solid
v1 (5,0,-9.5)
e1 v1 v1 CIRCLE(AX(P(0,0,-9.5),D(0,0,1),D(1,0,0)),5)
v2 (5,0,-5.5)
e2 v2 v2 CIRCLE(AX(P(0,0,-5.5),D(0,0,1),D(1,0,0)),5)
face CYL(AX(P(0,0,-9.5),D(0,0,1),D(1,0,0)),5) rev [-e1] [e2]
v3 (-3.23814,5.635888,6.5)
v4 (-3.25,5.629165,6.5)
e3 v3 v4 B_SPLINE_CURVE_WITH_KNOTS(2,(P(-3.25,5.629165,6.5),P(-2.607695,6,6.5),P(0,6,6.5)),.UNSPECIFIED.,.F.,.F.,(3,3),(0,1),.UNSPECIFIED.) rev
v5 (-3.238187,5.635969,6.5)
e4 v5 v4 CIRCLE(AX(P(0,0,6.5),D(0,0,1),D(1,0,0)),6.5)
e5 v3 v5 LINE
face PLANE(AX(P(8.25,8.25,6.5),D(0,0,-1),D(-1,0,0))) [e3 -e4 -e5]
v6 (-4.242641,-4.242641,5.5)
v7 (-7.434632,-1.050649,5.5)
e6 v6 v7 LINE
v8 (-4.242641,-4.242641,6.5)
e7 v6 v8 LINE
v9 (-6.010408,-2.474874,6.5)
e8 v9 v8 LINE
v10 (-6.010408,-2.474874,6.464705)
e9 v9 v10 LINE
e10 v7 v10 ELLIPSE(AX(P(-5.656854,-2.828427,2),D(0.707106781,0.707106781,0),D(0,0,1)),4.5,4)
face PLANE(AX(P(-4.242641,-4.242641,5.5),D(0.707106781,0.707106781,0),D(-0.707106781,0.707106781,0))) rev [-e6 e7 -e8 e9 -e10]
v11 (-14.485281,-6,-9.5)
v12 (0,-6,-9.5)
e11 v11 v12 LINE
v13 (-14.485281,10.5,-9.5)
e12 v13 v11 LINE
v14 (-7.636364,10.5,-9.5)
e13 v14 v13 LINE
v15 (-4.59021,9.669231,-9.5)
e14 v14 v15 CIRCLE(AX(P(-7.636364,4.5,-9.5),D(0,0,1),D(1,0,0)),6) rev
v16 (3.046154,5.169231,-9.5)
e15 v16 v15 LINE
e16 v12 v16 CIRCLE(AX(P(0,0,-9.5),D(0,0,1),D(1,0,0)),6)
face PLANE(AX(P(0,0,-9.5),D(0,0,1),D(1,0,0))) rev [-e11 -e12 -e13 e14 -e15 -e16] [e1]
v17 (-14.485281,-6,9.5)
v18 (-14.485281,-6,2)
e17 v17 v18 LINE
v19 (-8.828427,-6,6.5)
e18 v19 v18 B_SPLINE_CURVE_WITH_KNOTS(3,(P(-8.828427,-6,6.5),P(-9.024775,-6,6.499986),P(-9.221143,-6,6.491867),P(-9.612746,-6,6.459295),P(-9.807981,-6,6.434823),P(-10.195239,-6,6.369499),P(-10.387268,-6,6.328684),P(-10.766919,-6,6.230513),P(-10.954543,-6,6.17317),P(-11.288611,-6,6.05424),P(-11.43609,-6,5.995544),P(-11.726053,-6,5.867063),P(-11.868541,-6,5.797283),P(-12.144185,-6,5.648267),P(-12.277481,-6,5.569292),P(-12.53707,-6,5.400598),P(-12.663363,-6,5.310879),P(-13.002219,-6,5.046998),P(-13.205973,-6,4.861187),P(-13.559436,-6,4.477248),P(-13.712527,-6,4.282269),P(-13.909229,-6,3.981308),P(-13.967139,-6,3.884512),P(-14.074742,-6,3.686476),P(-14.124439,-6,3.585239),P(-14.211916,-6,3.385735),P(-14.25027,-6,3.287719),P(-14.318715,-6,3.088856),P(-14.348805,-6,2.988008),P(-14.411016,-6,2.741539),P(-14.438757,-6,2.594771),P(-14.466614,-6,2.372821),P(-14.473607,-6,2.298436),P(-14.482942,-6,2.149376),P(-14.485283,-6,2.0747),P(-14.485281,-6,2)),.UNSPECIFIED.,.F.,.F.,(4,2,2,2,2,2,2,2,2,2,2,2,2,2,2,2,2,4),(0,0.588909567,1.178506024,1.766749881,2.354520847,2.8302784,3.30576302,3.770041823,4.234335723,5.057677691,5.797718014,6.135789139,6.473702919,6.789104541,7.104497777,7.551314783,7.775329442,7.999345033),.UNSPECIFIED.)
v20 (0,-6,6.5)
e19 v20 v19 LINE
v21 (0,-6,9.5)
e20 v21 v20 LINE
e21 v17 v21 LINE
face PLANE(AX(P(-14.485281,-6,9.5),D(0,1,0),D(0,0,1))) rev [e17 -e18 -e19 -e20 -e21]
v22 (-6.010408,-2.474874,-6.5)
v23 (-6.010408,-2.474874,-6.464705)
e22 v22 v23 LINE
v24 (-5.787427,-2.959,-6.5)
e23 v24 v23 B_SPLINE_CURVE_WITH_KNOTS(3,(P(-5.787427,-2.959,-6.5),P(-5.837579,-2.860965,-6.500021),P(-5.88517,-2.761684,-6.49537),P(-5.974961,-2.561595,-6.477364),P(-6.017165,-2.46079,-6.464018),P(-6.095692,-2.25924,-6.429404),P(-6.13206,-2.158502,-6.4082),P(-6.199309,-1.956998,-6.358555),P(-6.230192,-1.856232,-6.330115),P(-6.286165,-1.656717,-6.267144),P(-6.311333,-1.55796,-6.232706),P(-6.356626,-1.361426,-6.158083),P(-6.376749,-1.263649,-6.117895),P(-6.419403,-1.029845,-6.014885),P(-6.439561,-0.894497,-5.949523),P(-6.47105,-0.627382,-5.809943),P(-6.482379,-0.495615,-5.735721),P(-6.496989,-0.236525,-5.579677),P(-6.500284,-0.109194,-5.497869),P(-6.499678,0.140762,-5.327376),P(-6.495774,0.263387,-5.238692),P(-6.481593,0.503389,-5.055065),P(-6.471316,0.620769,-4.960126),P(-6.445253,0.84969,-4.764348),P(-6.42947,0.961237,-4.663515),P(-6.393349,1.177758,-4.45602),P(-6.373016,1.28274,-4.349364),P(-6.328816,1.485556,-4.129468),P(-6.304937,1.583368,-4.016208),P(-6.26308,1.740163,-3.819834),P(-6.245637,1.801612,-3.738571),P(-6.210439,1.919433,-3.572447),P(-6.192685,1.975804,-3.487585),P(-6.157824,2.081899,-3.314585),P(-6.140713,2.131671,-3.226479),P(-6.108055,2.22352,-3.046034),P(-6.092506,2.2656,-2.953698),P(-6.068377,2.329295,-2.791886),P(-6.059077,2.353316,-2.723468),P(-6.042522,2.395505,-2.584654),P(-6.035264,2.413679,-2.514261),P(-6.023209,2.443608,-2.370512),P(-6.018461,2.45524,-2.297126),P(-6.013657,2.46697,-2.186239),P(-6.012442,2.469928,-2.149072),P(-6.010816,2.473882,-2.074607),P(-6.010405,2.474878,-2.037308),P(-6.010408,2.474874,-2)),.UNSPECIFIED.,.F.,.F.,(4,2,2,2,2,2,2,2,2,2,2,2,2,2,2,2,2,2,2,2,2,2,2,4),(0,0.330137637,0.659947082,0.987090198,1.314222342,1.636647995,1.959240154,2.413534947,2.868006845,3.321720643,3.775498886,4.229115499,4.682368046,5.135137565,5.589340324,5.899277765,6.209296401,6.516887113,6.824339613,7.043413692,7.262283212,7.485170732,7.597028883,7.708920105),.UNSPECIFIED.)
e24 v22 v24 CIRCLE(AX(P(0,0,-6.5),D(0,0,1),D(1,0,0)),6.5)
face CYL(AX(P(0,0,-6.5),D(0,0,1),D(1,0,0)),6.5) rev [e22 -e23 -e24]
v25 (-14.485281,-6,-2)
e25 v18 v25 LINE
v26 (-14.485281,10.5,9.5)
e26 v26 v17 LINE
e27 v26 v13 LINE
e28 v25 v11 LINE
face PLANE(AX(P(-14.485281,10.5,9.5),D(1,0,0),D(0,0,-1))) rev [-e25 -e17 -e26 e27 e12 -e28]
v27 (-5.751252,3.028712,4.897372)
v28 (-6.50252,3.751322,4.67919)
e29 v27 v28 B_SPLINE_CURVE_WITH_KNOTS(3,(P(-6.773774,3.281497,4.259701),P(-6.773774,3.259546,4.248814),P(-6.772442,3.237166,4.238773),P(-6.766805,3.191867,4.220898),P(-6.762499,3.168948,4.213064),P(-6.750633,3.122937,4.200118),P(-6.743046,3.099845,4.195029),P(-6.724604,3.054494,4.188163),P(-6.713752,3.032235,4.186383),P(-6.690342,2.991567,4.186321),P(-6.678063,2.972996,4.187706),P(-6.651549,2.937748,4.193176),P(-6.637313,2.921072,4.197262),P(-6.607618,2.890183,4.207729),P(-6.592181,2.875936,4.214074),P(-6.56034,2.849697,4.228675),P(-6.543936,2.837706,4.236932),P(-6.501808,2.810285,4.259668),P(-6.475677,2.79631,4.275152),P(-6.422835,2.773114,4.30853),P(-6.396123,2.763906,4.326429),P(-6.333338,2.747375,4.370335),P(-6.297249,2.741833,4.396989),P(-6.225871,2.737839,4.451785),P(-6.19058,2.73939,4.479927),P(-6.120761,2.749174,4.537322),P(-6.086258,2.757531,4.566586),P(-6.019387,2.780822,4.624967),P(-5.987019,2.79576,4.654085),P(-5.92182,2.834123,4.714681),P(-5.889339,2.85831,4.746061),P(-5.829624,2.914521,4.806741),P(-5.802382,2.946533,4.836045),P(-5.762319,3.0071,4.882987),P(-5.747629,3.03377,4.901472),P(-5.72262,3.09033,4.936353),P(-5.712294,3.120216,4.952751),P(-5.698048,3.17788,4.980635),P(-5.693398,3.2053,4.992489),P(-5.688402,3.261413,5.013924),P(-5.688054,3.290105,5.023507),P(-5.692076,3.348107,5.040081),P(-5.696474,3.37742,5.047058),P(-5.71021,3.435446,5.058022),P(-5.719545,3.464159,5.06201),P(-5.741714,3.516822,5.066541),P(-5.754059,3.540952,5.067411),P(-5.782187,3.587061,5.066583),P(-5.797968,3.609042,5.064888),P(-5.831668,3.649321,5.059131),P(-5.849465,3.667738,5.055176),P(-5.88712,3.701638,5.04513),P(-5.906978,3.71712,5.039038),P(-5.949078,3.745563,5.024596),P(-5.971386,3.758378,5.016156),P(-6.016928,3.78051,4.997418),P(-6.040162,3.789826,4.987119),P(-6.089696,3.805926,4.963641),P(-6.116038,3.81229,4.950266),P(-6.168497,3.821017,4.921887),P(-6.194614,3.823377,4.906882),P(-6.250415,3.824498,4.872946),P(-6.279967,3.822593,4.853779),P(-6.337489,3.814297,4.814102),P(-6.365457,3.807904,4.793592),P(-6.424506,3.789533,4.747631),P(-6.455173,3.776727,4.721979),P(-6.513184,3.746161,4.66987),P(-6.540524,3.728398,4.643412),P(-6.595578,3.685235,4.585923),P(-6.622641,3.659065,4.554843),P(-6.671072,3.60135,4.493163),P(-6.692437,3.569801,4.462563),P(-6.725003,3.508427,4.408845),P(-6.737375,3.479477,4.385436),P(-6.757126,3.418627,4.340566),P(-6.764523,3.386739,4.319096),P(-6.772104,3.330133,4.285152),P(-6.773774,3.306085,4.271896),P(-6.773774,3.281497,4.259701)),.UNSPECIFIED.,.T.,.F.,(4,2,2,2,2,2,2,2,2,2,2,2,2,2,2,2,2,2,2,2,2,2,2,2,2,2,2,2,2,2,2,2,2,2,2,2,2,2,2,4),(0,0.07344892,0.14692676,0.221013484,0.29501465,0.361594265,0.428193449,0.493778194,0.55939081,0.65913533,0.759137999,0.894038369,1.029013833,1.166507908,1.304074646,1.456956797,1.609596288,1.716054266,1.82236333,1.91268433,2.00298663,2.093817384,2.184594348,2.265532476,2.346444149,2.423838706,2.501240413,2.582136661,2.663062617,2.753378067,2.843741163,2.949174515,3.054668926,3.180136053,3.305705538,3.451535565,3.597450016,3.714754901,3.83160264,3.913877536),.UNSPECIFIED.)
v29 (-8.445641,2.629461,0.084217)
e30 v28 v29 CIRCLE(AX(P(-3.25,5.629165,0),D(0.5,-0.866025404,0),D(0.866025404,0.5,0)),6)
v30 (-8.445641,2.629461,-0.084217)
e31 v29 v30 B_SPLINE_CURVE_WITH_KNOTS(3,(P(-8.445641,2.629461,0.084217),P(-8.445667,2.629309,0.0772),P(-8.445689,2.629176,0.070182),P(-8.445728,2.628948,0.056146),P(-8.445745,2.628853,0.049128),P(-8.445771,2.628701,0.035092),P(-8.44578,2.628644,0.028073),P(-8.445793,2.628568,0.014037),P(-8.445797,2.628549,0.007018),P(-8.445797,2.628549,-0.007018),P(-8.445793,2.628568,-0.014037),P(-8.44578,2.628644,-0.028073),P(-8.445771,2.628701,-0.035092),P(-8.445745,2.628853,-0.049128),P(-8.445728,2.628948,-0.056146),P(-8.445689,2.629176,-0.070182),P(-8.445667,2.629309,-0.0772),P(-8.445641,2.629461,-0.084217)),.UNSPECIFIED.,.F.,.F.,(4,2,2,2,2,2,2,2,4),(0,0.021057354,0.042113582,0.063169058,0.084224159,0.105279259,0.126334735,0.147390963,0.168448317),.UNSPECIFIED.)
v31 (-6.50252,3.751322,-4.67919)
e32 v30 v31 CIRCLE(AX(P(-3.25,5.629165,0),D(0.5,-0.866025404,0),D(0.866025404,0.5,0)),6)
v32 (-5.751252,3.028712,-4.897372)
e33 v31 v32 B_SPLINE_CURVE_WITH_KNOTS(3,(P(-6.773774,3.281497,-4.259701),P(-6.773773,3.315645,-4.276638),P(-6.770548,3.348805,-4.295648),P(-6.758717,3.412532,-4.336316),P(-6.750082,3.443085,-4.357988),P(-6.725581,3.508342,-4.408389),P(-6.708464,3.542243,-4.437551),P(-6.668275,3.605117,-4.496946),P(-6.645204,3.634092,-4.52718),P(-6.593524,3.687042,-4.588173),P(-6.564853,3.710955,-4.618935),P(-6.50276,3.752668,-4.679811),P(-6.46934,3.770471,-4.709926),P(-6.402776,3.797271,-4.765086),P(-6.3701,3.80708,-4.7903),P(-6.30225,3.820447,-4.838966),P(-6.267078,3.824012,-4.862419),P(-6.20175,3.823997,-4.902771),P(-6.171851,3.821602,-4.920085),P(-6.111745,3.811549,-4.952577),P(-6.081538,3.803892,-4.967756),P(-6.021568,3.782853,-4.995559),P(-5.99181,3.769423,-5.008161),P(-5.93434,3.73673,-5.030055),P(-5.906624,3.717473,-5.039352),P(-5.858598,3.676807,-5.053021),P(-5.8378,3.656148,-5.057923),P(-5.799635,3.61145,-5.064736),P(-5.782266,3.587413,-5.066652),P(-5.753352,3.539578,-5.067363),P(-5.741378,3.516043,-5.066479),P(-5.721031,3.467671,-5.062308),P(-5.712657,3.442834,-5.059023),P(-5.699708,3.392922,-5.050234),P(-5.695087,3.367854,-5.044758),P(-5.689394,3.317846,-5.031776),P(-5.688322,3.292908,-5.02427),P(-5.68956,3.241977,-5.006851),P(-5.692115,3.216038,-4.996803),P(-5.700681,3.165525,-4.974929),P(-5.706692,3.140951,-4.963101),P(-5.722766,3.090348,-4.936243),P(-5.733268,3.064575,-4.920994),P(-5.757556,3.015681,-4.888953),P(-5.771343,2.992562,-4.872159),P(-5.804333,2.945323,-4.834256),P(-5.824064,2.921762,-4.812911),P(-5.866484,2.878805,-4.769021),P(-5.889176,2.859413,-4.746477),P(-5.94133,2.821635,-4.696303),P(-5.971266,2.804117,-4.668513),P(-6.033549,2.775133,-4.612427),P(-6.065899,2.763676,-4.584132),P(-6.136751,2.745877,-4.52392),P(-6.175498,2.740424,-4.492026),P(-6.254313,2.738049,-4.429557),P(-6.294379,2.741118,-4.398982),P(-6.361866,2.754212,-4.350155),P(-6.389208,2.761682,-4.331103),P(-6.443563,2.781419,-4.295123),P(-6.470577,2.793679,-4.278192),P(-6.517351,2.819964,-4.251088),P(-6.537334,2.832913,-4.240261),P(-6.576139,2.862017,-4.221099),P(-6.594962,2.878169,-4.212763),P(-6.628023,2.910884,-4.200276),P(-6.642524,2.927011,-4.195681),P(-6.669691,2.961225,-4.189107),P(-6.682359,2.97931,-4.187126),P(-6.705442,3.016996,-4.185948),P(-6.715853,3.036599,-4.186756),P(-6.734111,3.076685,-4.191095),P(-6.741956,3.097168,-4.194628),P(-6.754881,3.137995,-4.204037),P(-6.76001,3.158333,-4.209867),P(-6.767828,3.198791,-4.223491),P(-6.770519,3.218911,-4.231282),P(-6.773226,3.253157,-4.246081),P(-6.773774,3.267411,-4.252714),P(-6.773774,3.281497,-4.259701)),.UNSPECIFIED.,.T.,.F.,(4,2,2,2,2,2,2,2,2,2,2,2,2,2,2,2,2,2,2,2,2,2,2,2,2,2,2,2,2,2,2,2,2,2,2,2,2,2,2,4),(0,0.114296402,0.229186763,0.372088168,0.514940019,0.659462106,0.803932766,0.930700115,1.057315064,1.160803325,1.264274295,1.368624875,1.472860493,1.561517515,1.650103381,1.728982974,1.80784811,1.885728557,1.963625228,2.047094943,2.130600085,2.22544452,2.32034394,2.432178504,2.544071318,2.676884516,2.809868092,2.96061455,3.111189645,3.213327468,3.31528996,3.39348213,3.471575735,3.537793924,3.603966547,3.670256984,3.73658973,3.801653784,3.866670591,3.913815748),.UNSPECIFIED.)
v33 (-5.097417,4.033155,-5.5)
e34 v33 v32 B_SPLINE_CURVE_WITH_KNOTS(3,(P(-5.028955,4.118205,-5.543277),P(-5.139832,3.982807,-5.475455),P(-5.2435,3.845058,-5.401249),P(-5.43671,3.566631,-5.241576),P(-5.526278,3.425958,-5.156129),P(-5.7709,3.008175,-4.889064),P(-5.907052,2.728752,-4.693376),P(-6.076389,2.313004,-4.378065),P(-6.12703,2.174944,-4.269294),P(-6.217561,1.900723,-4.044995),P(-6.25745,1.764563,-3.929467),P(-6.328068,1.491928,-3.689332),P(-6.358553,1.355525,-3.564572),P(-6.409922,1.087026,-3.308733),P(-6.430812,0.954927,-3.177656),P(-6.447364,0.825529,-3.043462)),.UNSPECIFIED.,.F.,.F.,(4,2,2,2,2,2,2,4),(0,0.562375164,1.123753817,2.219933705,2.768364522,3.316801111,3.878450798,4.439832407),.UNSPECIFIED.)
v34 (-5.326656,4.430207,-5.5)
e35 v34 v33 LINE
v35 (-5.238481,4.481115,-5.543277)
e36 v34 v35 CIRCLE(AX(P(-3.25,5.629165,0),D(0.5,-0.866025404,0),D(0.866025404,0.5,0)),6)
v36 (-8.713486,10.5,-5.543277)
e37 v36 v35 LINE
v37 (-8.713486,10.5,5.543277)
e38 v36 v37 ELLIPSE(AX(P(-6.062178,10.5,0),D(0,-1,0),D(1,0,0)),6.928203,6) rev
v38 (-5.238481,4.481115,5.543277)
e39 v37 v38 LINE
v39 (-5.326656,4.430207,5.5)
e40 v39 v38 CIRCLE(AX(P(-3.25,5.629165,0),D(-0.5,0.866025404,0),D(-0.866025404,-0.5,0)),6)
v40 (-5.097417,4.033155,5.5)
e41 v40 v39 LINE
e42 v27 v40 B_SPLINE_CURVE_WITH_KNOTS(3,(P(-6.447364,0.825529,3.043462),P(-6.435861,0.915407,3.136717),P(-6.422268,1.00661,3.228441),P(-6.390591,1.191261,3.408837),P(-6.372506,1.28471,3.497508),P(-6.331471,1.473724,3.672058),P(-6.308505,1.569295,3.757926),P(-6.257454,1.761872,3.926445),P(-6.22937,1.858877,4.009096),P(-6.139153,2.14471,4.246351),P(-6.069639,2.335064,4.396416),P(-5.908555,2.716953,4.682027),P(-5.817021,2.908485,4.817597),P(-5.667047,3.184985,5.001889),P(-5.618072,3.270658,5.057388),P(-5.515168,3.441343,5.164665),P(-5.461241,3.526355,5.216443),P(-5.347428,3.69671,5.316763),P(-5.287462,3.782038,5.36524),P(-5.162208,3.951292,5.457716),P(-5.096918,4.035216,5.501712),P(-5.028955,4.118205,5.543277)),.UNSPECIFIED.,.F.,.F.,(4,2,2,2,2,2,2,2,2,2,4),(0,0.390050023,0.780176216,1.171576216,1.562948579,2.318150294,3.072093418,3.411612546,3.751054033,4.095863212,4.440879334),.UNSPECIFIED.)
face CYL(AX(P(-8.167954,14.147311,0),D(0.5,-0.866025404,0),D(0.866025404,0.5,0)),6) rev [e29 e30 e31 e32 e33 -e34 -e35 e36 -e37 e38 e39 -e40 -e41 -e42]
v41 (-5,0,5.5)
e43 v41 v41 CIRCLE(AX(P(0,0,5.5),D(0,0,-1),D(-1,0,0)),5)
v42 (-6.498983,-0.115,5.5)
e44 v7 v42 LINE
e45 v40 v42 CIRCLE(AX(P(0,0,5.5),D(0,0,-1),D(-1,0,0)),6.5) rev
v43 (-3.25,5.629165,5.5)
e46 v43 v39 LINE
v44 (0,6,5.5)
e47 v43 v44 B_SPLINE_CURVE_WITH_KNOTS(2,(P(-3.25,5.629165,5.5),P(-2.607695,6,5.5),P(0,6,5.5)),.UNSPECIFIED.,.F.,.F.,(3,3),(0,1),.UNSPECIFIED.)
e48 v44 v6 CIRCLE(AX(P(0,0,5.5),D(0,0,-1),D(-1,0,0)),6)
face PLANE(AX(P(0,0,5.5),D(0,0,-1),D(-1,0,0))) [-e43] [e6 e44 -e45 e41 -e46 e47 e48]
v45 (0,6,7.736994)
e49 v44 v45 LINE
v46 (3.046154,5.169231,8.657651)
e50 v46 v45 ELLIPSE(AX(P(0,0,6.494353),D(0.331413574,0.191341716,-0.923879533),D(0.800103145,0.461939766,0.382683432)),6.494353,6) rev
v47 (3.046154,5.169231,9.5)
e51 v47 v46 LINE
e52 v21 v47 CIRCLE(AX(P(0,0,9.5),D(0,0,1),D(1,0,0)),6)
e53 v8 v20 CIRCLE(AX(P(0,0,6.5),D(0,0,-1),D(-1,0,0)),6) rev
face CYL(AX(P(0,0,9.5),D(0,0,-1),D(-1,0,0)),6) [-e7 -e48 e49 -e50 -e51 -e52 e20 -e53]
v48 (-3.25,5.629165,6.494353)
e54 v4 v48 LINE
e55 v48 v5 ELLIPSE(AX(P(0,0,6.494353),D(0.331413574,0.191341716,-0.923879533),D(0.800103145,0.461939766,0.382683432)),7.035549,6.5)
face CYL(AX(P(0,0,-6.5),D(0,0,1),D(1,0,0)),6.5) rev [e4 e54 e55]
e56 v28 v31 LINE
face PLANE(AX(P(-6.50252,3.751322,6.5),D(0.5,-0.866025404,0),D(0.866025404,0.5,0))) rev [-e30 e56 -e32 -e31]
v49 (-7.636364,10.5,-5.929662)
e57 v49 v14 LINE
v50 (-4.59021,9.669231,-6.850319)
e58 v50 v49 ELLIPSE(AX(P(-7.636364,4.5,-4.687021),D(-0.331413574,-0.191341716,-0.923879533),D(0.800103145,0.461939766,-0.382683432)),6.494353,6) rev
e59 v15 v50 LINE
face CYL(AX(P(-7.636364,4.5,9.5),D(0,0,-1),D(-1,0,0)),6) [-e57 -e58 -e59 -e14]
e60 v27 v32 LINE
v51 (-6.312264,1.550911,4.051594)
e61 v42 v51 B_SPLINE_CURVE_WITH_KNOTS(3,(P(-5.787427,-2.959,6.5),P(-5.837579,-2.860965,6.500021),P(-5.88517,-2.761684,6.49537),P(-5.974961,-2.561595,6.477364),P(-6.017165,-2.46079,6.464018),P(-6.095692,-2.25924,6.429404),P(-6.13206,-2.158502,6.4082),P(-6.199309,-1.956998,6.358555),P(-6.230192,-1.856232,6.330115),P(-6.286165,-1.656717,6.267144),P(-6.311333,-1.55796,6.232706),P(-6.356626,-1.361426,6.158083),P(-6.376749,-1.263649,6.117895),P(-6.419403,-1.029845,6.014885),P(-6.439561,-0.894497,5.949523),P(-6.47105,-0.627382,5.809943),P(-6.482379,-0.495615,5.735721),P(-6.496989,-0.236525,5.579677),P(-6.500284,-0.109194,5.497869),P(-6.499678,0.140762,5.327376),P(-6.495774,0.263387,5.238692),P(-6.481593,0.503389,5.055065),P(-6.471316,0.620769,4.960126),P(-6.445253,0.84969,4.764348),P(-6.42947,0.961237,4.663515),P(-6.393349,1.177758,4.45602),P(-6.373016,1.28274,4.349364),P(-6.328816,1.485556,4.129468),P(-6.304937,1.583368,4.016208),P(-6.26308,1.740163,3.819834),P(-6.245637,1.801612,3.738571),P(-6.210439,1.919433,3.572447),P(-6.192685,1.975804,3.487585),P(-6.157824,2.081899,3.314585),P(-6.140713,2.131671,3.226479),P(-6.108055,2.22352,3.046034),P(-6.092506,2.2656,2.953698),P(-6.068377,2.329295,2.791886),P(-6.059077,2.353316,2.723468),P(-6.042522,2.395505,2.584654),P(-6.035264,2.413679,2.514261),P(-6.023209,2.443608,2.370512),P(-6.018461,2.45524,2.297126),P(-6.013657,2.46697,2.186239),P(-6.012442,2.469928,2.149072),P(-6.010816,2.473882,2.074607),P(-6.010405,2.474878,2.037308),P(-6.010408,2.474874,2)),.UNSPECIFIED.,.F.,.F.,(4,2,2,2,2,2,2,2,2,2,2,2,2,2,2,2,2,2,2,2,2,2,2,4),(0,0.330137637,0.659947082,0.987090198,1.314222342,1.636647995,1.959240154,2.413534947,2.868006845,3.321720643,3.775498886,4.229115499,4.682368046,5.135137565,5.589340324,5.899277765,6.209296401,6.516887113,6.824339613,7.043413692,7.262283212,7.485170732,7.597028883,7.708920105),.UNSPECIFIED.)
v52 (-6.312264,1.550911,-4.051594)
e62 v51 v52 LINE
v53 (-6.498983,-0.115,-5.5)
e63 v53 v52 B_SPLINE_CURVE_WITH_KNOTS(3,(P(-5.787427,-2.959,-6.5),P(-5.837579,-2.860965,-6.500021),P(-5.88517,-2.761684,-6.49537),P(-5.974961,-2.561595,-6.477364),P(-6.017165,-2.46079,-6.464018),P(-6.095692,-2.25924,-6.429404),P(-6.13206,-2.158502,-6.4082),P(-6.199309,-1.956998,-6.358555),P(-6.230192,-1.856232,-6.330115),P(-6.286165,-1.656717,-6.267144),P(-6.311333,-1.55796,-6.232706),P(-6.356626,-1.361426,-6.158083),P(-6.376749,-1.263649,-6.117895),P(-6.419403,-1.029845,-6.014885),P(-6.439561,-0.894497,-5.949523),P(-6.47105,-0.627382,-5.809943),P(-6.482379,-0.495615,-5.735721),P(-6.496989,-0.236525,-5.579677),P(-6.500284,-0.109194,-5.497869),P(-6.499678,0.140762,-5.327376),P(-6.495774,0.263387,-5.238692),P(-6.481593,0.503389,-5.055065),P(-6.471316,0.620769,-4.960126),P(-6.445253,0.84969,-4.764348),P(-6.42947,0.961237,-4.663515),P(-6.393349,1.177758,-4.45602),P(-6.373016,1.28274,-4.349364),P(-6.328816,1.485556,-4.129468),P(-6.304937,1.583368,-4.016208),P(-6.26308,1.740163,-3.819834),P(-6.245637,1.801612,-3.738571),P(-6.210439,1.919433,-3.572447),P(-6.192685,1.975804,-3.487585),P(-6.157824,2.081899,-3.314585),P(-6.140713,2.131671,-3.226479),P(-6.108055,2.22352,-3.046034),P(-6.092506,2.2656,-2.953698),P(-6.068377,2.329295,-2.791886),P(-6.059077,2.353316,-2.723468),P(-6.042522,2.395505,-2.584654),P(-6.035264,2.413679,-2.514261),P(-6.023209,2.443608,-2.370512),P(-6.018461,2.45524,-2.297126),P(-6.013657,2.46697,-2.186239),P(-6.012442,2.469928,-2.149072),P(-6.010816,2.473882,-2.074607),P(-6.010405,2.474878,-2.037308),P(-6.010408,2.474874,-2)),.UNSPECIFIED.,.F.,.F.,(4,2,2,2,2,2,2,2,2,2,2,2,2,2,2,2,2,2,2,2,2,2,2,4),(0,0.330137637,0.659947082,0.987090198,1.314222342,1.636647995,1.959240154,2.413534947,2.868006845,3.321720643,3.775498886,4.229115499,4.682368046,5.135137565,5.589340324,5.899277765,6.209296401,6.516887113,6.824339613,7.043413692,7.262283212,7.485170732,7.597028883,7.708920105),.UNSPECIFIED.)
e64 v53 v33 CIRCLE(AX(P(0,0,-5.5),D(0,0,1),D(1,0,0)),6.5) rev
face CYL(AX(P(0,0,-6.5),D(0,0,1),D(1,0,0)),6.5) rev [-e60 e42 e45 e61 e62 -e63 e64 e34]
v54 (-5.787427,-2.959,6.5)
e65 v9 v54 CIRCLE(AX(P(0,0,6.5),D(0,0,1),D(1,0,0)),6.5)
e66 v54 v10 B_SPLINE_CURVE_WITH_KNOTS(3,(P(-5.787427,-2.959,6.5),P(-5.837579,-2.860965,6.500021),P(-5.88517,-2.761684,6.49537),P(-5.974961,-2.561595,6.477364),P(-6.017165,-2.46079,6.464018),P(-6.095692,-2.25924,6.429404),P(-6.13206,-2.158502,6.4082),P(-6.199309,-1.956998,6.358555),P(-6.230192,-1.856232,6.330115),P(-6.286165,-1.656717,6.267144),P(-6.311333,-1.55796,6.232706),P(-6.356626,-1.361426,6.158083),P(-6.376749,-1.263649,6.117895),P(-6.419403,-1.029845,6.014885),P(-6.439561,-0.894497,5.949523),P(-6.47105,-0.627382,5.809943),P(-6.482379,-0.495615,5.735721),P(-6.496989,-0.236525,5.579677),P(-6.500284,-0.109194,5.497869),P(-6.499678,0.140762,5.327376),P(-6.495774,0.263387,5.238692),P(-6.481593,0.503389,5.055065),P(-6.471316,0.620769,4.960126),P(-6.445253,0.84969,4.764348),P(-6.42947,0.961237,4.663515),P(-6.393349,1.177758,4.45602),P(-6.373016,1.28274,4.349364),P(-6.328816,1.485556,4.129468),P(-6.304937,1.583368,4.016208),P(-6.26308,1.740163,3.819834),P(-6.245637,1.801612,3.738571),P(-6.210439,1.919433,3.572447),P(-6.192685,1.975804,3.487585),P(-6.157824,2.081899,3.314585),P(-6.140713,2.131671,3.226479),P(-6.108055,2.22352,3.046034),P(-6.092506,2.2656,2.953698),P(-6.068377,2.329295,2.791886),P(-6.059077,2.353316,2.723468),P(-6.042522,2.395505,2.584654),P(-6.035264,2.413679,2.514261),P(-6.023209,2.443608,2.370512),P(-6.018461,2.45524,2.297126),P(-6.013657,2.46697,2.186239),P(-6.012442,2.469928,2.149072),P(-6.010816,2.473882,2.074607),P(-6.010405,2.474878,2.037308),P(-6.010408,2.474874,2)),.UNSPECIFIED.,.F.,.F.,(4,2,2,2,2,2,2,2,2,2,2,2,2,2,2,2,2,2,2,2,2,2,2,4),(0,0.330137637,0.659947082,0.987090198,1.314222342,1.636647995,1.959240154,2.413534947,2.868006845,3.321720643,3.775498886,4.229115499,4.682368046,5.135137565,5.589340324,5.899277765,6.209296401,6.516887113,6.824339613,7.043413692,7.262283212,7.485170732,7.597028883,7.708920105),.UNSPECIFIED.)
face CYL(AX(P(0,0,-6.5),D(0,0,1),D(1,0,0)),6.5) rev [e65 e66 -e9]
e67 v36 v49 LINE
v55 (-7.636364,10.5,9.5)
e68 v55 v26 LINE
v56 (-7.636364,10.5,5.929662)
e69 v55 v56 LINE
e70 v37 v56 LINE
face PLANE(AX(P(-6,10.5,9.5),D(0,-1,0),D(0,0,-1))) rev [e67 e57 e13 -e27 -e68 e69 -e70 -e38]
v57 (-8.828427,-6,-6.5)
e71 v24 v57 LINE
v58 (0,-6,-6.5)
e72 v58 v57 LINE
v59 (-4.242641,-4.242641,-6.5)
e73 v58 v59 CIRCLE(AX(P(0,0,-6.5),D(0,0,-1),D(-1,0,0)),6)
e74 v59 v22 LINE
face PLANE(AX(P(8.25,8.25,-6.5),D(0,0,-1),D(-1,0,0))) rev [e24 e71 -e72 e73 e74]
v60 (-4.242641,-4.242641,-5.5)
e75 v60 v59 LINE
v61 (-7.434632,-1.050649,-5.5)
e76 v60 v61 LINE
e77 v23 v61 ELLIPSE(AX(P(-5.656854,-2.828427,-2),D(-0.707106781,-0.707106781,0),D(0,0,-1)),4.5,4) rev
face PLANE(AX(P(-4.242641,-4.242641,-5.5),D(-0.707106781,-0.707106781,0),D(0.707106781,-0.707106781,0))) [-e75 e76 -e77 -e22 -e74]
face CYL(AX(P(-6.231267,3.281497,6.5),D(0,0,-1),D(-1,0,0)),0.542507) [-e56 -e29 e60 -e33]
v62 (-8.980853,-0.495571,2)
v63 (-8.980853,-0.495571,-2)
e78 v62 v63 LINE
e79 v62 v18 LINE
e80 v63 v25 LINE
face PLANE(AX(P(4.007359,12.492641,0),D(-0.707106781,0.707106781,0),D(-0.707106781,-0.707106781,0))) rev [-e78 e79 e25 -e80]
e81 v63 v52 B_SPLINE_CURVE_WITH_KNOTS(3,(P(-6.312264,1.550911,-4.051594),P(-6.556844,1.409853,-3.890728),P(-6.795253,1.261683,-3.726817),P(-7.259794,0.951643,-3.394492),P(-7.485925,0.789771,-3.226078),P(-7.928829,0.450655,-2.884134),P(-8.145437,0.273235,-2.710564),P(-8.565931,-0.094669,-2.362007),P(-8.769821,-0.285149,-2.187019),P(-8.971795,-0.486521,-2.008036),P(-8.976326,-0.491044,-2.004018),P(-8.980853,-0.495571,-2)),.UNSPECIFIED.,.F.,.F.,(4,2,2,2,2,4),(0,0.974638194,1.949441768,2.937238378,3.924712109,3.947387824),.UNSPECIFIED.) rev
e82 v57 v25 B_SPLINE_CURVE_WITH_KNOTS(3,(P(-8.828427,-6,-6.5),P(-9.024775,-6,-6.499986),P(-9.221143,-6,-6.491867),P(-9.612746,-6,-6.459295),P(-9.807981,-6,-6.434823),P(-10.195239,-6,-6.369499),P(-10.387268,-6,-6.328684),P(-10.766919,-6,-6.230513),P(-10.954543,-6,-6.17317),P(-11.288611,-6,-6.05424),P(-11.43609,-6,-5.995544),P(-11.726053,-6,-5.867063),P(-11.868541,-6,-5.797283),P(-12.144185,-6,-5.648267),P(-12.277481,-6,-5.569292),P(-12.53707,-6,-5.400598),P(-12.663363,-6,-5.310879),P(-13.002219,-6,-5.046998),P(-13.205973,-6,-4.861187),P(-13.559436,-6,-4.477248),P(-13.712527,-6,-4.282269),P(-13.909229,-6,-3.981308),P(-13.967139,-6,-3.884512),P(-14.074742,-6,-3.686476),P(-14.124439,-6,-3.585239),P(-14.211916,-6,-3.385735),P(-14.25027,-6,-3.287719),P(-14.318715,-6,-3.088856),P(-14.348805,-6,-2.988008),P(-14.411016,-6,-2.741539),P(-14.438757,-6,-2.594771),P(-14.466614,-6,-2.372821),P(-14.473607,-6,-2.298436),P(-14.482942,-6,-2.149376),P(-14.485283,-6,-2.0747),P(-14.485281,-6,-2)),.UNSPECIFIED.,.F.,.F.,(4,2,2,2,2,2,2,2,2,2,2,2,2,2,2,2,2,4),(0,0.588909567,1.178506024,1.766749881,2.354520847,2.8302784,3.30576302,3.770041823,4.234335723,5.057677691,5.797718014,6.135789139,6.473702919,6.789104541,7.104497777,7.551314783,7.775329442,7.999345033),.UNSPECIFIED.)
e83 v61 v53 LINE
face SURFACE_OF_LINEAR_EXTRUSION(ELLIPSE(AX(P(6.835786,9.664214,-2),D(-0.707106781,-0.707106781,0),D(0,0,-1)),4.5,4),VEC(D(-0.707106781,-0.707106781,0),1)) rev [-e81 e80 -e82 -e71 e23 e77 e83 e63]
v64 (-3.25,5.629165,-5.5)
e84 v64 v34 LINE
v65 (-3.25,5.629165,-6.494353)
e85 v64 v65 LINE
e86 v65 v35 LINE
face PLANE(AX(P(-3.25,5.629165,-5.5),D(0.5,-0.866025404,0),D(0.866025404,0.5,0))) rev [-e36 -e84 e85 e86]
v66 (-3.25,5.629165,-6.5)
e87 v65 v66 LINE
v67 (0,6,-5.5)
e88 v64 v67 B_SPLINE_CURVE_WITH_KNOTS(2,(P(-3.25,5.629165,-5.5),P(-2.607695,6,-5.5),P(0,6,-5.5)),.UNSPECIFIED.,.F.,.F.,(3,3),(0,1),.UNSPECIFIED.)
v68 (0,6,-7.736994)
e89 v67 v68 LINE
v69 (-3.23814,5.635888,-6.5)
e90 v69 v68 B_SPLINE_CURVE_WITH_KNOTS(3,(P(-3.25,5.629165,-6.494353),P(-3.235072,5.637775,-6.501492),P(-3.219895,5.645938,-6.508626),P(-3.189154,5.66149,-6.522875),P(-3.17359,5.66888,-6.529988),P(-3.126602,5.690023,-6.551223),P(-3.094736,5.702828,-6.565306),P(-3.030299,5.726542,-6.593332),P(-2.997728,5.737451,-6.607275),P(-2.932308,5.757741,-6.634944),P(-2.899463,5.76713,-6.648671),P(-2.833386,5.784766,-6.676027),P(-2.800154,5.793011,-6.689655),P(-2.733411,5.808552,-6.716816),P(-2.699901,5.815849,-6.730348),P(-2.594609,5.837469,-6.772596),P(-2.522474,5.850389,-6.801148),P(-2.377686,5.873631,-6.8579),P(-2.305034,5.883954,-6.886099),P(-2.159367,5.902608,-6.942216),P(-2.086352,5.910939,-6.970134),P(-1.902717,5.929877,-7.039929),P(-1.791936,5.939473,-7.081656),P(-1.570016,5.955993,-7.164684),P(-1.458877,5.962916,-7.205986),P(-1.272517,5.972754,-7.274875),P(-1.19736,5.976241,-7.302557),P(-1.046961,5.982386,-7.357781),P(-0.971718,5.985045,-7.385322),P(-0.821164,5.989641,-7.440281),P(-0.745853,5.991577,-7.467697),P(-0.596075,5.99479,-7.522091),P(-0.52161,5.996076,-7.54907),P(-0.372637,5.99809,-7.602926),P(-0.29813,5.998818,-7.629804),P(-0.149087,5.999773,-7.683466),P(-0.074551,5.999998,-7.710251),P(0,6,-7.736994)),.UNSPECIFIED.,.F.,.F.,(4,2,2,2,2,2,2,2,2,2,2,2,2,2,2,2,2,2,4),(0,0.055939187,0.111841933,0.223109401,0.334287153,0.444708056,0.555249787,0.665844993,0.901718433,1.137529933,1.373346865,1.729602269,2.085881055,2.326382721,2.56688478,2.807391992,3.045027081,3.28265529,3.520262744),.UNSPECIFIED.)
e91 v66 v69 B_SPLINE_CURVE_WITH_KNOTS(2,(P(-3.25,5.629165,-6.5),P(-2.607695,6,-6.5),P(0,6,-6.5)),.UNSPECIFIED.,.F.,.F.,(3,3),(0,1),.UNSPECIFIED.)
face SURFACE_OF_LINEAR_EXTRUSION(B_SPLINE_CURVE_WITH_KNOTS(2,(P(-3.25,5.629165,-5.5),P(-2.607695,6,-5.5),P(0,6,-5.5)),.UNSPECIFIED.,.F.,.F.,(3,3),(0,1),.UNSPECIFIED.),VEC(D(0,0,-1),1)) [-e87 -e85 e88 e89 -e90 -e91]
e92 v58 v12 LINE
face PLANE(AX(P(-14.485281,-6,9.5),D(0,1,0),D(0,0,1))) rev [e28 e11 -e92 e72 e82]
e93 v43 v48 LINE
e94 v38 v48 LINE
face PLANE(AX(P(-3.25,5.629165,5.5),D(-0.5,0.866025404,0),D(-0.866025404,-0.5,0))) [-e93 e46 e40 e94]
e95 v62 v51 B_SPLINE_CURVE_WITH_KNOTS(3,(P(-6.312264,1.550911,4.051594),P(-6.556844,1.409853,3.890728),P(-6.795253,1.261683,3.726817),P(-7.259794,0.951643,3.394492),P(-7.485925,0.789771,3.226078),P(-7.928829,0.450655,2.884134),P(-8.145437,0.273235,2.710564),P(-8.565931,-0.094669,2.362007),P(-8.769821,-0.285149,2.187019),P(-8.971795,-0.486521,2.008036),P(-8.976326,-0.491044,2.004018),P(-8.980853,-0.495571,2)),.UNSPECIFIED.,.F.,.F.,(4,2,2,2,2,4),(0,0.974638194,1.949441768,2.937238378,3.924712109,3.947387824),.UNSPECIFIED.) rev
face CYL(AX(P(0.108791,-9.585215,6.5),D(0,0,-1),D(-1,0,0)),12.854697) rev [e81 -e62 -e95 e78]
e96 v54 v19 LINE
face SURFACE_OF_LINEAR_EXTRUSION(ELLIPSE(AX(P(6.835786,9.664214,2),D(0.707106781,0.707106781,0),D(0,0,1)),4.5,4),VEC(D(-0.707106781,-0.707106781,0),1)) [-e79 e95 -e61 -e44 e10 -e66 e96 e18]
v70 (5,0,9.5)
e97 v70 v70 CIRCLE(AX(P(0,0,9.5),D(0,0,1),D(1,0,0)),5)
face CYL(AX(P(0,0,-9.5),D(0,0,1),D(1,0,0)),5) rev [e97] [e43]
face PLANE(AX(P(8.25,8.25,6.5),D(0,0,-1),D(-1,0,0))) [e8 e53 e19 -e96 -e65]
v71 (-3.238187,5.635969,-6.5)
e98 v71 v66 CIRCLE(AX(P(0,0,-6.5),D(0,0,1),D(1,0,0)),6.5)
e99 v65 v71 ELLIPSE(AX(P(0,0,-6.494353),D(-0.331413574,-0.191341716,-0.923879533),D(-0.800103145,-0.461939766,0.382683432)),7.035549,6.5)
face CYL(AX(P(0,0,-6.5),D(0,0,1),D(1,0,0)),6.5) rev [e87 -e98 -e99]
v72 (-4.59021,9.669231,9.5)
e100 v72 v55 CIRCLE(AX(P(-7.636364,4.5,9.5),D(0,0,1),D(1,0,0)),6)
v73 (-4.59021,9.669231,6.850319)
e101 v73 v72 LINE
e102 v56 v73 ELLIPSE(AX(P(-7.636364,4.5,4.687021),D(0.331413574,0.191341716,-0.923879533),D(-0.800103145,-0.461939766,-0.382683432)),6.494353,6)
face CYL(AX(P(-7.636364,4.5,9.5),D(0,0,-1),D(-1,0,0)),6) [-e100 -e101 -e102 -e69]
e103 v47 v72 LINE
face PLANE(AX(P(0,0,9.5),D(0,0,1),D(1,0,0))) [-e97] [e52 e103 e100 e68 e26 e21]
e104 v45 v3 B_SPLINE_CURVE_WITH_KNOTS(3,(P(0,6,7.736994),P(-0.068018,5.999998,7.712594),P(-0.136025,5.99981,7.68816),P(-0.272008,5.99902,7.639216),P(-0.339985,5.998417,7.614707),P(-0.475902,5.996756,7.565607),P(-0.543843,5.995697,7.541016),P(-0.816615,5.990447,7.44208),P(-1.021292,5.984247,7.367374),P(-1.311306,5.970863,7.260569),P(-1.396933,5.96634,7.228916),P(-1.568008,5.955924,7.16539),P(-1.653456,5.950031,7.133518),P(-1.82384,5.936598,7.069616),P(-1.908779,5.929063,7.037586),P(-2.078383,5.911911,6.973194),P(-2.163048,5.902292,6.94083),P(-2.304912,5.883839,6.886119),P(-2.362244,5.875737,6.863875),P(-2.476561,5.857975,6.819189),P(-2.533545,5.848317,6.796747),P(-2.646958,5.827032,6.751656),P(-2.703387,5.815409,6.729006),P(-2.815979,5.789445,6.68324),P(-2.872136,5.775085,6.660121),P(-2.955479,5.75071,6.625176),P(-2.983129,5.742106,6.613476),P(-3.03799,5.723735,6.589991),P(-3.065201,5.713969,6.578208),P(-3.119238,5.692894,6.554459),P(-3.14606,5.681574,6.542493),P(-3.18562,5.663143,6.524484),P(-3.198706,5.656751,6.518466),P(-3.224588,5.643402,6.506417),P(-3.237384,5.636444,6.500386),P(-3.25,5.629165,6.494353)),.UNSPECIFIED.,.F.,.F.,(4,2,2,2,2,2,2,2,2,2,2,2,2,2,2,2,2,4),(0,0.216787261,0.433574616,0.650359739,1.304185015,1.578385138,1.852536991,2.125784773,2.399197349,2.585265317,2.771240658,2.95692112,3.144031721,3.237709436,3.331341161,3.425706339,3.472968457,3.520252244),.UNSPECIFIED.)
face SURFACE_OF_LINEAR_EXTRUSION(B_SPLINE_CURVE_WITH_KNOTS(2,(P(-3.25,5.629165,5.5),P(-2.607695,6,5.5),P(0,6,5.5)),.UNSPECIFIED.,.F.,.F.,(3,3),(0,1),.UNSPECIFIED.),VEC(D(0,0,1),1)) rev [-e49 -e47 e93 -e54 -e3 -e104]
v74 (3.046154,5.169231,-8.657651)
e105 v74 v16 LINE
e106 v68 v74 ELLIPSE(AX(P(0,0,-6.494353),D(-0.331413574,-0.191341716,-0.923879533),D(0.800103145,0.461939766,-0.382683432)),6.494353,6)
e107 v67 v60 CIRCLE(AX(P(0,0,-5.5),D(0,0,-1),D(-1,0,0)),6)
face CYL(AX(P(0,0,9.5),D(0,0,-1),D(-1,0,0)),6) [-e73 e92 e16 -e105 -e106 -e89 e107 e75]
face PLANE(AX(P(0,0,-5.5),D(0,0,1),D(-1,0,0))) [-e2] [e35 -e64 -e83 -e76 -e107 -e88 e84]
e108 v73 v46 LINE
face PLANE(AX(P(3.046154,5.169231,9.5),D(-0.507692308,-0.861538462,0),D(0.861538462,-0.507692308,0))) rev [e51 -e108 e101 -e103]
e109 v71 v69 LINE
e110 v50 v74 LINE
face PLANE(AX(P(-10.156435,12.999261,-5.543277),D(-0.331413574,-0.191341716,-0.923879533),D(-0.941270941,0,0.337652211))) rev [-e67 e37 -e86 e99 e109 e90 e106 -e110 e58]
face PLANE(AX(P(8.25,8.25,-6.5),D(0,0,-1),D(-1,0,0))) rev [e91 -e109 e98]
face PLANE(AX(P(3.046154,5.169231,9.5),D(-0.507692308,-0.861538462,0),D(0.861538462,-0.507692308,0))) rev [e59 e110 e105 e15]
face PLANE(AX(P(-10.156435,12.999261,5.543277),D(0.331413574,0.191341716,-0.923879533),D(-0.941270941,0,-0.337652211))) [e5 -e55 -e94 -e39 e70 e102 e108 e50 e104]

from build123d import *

# Parameters (mm, degrees)
EXTRUDE_1_DEPTH          = 9.5
CUT_EXTRUDE_1_DEPTH      = 19.754173631
CUT_EXTRUDE_1_DEPTH_BACK = 19.754173631
CUT_EXTRUDE_3_DEPTH      = 18.322626143
CUT_EXTRUDE_3_DEPTH_BACK = 18.322626143
SKETCH_5_R               = 6.5
CUT_EXTRUDE_4_DEPTH      = 6.5
EXTRUDE_2_DEPTH          = 6.5
EXTRUDE_START            = -3
EXTRUDE_3_DEPTH          = 4
CUT_EXTRUDE_5_DEPTH      = 21.256440541
CUT_EXTRUDE_5_DEPTH_BACK = 21.256440541
SKETCH_10_R              = 5
FILLET_1_R               = 6


with BuildPart() as part:
    # Эскиз2 → Бобышка-Вытянуть1 (new, symmetric)
    with BuildSketch(Plane.XY):
        with BuildLine():
            Line((3.046153846, 5.169230769), (-6, 10.5))
            Line((-6, 10.5), (-14.485281374, 10.5))
            Line((-14.485281374, 10.5), (-14.485281374, -6))
            Line((-14.485281374, -6), (0, -6))
            ThreePointArc((0, -6), (5.788582927, -1.578704435), (3.046153846, 5.169230769))
        make_face()
    extrude(amount=EXTRUDE_1_DEPTH, both=True)

    # Эскиз3 → Вырез-Вытянуть1 (cut, two sides: drawn at the far end of the back side and taken through both)
    with BuildSketch(Plane(origin=(-3.249999973, 5.629165078, 0), x_dir=(0.8660254037844386, 0.4999999999999999, 0), z_dir=(-0.49999999999999994, 0.8660254037844387, 0)).offset(-CUT_EXTRUDE_1_DEPTH_BACK)):
        with BuildLine():
            Line((6, -8.979634576), (6, 8.979634576))
            Line((6, 8.979634576), (-2.296100594, 5.543277195))
            ThreePointArc((-2.296100594, 5.543277195), (-6, 0), (-2.296100594, -5.543277195))
            Line((-2.296100594, -5.543277195), (6, -8.979634576))
        make_face()
    extrude(amount=CUT_EXTRUDE_1_DEPTH + CUT_EXTRUDE_1_DEPTH_BACK, mode=Mode.SUBTRACT)

    # Эскиз4 → Вырез-Вытянуть3 (cut, two sides: drawn at the far end of the back side and taken through both)
    with BuildSketch(Plane(origin=(-4.242640687, 4.242640687, 0), x_dir=(-0.7071067811865511, 0.707106781186544, 0), z_dir=(-0.707106781186544, -0.7071067811865511, 0)).offset(-CUT_EXTRUDE_3_DEPTH_BACK)):
        with BuildLine():
            Line((-12, -6.5), (-4, -6.5))
            add(Edge.make_bspline(
                [(-4, -6.5), (0, -6.5), (0, -2)],
                knots=[0, 0, 0, 1.570796327, 1.570796327, 1.570796327], degree=2, weights=[1, 0.707106781, 1]))
            Line((0, -2), (0, 2))
            add(Edge.make_bspline(
                [(0, 2), (0, 6.5), (-4, 6.5)],
                knots=[4.71238898, 4.71238898, 4.71238898, 6.283185307, 6.283185307, 6.283185307], degree=2, weights=[1, 0.707106781, 1]))
            Line((-4, 6.5), (-12, 6.5))
            Line((-12, 6.5), (-12, -6.5))
        make_face()
    extrude(amount=CUT_EXTRUDE_3_DEPTH + CUT_EXTRUDE_3_DEPTH_BACK, mode=Mode.SUBTRACT)

    # Эскиз5 → Вырез-Вытянуть4 (cut, symmetric)
    with BuildSketch(Plane.XY):
        Circle(SKETCH_5_R)
    extrude(amount=CUT_EXTRUDE_4_DEPTH, both=True, mode=Mode.SUBTRACT)

    # Эскиз6 → Бобышка-Вытянуть2 (add, symmetric)
    with BuildSketch(Plane.XY):
        with BuildLine():
            Line((-6.502520338, 3.75132157), (-8.445640507, 2.629460617))
            Line((-8.445640507, 2.629460617), (-8.980852778, -0.495571404))
            ThreePointArc((-8.980852778, -0.495571404), (-7.713770339, 0.615313333), (-6.312263919, 1.550910769))
            ThreePointArc((-6.312263919, 1.550910769), (-6.076847823, 2.306928809), (-5.751252167, 3.028712353))
            ThreePointArc((-5.751252167, 3.028712353), (-5.855186593, 3.672492332), (-6.502520338, 3.75132157))
        make_face()
    extrude(amount=EXTRUDE_2_DEPTH, both=True)

    # Эскиз9 → Бобышка-Вытянуть3 (add)
    with BuildSketch(Plane(origin=(0, 0, 6.5), x_dir=(-1, 0, 0), z_dir=(0, 0, -1)).offset(EXTRUDE_START)):
        with BuildLine():
            Line((4.242640687, -4.242640687), (10.137783082, 1.652501708))
            Line((10.137783082, 1.652501708), (3.25, 5.629165125))
            add(Edge.make_bspline(
                [(3.25, 5.629165125), (2.607695155, 6), (0, 6)],
                knots=[0, 0, 0, 1, 1, 1], degree=2))
            ThreePointArc((0, 6), (-5.543277195, -2.296100594), (4.242640687, -4.242640687))
        make_face()
    extrude_3 = extrude(amount=EXTRUDE_3_DEPTH)

    # Зеркальное отражение1: Бобышка-Вытянуть3 across plane
    add(extrude_3.mirror(Plane.XY))

    # Эскиз10 → Вырез-Вытянуть5 (cut, two sides: drawn at the far end of the back side and taken through both)
    with BuildSketch(Plane.XY.offset(-CUT_EXTRUDE_5_DEPTH_BACK)):
        Circle(SKETCH_10_R)
    extrude(amount=CUT_EXTRUDE_5_DEPTH + CUT_EXTRUDE_5_DEPTH_BACK, mode=Mode.SUBTRACT)

    # Скругление1
    fillet_1_edges = [part.edges().sort_by_distance(p)[0] for p in [
        (-6, 10.5, 8.008328799),
        (-6, 10.5, -8.008328799),
    ]]
    fillet(fillet_1_edges, radius=FILLET_1_R)


solid = part.part
